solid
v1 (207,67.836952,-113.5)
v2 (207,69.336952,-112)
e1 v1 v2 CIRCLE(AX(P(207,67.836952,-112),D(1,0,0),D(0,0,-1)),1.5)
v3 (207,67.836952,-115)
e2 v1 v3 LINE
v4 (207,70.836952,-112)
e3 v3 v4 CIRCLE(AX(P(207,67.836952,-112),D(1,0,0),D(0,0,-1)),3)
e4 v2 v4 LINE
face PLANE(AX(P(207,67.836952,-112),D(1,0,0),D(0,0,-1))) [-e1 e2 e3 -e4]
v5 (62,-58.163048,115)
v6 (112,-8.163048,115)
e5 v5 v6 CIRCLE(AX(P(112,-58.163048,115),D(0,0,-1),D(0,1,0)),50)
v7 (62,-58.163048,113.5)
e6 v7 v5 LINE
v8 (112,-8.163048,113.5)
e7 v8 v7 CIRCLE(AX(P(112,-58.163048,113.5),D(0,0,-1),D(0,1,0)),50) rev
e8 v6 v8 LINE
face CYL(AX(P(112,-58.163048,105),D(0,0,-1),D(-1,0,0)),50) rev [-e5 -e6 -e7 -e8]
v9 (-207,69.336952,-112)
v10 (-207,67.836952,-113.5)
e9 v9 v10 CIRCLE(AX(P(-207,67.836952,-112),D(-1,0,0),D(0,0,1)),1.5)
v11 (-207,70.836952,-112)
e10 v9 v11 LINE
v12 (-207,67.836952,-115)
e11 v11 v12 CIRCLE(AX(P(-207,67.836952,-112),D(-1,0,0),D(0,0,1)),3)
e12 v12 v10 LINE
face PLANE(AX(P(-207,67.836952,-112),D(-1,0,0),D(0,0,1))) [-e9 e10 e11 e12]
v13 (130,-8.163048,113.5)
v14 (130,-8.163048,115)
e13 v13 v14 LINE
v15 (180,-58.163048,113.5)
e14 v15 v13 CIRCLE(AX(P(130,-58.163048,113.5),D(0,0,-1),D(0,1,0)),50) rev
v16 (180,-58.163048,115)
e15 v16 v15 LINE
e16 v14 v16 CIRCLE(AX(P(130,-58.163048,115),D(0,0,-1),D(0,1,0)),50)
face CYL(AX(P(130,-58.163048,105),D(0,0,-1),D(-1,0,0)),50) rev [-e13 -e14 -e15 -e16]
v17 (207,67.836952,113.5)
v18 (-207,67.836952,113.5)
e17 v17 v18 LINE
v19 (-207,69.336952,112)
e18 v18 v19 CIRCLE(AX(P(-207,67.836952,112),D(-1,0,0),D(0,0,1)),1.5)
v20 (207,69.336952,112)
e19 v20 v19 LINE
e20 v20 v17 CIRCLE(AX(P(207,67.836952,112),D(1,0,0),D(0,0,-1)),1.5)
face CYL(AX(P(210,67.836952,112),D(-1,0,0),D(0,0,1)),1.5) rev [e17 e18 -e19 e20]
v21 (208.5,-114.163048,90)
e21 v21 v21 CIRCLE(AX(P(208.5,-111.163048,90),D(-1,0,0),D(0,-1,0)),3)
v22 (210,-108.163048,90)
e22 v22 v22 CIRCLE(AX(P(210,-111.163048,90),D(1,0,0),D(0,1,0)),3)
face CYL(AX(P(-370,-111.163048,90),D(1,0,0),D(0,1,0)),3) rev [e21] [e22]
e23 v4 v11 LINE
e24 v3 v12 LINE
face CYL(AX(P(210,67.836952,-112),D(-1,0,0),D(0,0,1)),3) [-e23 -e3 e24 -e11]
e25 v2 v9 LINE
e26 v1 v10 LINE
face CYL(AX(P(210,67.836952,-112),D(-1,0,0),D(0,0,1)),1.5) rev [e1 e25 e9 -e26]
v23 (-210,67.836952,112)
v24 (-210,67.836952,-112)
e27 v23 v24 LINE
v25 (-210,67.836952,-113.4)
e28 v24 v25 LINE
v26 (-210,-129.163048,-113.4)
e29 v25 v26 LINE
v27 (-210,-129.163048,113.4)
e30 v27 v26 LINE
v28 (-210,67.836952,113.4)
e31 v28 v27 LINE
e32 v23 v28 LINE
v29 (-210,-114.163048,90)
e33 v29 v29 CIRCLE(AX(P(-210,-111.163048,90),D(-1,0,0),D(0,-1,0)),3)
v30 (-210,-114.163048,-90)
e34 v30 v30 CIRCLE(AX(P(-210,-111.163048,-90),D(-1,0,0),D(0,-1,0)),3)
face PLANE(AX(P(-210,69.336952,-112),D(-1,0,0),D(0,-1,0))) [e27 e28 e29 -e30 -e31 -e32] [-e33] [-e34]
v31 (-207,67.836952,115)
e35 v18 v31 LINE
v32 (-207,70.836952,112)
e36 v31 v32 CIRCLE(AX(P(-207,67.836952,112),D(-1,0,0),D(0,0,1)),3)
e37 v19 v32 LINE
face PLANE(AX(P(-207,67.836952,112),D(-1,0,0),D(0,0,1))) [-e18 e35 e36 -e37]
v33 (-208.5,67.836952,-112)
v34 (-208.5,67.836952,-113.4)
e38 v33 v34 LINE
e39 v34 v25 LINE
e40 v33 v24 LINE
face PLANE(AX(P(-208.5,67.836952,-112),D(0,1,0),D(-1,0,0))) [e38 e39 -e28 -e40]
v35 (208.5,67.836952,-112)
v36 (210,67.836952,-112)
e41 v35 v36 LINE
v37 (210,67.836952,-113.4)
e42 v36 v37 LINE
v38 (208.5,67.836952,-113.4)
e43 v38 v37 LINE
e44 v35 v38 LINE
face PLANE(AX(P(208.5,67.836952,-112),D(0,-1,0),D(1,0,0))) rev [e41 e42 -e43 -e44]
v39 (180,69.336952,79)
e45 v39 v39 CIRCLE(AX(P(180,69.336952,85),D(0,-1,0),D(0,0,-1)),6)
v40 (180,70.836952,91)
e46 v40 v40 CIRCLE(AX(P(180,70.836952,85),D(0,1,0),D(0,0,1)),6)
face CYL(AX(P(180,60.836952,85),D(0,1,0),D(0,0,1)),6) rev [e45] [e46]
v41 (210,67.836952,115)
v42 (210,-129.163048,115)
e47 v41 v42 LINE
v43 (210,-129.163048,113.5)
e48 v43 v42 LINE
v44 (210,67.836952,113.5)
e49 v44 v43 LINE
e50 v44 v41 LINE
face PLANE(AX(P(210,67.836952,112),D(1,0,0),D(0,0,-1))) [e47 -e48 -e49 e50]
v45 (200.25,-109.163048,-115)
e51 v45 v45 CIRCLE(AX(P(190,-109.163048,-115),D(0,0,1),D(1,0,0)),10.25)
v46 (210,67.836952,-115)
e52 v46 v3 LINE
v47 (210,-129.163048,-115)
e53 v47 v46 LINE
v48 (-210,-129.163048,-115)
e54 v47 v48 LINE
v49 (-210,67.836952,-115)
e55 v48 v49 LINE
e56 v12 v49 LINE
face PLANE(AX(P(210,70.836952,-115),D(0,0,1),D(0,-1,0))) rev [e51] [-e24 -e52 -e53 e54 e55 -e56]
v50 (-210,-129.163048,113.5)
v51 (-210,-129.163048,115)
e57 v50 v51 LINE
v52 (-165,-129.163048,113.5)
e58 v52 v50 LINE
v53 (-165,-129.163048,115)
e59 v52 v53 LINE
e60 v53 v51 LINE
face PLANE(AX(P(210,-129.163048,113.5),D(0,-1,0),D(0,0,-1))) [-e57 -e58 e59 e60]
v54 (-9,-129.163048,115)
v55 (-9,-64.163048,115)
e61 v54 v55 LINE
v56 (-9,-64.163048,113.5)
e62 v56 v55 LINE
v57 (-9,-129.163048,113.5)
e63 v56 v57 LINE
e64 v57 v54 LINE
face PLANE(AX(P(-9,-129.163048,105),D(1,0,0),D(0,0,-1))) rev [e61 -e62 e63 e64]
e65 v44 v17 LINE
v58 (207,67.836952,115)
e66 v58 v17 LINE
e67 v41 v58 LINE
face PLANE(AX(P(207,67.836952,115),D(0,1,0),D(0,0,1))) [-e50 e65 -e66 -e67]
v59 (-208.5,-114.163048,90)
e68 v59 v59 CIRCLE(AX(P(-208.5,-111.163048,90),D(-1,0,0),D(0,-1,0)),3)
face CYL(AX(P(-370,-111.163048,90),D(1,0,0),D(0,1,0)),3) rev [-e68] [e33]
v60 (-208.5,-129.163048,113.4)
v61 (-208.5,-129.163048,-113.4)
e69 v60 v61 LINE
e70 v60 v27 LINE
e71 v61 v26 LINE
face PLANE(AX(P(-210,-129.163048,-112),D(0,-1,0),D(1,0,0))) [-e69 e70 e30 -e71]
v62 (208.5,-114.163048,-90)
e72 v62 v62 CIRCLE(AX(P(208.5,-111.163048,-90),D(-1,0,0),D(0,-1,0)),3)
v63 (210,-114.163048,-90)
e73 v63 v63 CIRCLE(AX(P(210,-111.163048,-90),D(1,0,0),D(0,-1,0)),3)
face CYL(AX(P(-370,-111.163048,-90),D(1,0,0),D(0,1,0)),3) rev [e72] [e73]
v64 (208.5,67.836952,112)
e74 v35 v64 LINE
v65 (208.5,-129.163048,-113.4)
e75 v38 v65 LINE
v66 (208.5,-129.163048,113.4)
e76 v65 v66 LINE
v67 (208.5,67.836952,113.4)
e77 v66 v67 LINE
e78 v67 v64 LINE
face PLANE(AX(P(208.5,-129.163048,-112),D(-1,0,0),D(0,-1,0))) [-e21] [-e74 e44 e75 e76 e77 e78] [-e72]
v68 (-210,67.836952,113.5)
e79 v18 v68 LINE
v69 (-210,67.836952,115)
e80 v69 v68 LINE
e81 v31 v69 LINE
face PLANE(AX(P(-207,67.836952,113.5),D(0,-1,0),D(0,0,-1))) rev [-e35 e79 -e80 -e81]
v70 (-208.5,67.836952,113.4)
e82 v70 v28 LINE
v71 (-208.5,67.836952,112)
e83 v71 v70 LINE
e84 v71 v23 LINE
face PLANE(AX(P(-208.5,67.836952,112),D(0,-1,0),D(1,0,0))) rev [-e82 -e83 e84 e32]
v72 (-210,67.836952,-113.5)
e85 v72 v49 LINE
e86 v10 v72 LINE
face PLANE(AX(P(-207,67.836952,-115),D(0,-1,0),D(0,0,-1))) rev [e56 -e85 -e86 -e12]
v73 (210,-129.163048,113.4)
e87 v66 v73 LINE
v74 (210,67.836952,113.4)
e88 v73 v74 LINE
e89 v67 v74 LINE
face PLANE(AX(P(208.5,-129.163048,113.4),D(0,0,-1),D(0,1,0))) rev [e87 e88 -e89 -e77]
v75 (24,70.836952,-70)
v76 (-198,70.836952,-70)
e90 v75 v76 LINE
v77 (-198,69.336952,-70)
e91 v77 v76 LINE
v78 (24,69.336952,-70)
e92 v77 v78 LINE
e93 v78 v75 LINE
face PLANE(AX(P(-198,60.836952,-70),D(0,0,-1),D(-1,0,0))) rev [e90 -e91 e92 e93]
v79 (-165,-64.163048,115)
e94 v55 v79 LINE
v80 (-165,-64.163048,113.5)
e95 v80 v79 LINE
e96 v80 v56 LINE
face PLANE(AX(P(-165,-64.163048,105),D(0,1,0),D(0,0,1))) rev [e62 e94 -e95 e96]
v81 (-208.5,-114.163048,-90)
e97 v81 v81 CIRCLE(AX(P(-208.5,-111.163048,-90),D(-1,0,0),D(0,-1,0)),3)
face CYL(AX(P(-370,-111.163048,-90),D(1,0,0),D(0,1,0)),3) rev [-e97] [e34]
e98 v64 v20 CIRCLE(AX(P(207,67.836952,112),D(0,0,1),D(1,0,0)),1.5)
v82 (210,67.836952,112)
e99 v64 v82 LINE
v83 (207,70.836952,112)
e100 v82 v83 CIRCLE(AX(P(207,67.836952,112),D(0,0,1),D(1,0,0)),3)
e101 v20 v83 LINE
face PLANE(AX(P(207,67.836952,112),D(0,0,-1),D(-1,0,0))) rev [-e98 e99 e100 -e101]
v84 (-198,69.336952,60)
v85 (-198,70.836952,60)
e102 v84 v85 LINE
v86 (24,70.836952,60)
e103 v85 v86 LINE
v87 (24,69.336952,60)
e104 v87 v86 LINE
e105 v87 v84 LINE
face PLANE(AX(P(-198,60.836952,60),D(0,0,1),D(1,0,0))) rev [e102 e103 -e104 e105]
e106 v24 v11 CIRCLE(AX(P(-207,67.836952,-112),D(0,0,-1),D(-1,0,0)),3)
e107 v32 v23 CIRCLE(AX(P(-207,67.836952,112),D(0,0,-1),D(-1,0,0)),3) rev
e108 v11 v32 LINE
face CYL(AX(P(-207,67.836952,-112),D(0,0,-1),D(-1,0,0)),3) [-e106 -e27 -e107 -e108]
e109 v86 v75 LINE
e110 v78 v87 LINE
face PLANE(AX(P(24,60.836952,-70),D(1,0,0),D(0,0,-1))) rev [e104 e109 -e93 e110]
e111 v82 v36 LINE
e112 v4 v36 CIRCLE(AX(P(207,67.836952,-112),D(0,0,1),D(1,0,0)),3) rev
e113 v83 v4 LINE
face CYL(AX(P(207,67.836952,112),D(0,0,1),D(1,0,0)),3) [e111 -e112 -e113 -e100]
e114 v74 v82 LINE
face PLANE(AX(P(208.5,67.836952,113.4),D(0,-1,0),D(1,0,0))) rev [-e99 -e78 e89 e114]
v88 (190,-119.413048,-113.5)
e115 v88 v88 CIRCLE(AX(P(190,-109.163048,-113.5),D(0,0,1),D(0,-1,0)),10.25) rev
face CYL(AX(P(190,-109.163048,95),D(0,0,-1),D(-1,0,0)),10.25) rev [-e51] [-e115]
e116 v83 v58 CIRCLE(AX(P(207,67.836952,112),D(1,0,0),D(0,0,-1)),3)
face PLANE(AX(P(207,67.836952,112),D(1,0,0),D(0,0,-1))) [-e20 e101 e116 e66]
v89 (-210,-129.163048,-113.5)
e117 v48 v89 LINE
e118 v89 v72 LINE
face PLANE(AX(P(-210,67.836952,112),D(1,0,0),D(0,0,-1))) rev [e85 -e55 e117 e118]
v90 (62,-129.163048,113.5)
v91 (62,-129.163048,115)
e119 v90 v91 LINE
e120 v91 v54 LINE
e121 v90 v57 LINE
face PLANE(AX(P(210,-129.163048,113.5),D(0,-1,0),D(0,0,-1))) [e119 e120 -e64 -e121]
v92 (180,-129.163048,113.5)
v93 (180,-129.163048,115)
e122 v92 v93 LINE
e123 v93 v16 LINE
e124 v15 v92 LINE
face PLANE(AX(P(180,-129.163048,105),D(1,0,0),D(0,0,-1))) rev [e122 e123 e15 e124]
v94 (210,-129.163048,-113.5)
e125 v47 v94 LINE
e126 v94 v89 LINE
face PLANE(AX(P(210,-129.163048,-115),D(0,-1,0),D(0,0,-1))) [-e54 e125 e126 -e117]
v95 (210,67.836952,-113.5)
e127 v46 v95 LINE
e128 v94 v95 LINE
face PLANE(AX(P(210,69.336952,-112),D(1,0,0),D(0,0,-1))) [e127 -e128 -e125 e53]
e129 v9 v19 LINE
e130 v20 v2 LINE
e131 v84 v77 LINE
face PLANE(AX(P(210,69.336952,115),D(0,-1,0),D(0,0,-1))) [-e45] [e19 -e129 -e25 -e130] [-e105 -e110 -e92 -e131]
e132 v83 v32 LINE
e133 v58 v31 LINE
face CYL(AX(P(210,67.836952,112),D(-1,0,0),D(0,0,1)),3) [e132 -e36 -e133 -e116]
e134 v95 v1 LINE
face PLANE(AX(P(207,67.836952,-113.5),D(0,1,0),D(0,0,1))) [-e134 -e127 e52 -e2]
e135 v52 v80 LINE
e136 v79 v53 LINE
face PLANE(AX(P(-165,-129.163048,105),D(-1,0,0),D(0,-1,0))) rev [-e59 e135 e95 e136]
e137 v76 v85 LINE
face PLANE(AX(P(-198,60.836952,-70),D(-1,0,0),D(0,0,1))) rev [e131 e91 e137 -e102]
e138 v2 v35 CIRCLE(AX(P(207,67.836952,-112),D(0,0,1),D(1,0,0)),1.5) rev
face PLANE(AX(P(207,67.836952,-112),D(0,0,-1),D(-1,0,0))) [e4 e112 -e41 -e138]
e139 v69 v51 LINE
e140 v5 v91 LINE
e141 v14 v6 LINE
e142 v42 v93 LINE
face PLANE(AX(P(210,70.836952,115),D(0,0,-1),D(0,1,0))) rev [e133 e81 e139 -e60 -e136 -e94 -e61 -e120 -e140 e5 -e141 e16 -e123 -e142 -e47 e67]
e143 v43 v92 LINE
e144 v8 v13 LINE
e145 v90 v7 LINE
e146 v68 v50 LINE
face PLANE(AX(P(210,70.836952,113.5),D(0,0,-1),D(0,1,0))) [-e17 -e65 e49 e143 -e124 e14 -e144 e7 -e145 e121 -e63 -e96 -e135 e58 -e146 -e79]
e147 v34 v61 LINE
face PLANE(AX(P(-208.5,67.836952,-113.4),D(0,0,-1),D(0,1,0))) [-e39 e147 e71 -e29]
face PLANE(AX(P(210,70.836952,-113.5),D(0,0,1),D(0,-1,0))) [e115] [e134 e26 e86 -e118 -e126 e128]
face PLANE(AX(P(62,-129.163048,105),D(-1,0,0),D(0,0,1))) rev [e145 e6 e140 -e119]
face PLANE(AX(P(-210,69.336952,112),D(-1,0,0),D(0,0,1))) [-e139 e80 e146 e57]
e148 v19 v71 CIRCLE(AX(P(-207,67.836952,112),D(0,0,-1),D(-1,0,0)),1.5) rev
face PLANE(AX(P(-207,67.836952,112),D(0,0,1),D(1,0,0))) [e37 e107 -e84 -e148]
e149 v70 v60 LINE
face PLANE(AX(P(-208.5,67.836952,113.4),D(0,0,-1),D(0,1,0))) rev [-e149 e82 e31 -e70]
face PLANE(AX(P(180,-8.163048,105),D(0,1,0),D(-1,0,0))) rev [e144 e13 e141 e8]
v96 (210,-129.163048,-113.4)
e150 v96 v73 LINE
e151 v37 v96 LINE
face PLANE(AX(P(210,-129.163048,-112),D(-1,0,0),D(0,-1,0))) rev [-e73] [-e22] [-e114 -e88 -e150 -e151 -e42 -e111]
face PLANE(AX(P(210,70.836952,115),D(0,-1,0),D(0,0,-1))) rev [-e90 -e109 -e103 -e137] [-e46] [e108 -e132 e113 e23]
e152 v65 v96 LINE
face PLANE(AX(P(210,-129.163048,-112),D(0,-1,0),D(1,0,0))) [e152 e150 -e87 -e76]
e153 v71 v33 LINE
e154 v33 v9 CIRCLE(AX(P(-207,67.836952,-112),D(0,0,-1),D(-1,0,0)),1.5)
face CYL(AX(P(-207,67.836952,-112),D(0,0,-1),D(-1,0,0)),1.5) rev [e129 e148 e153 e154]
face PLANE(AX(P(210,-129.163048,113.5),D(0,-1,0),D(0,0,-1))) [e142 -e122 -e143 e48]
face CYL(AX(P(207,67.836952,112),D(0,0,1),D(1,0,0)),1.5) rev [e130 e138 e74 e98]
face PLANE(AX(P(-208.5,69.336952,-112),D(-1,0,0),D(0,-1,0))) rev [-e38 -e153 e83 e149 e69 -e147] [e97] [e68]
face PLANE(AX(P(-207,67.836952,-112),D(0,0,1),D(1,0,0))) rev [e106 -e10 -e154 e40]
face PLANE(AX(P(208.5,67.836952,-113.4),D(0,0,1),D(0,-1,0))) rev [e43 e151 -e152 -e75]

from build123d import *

# Parameters (mm, degrees)
BASE_FLANGE2_DEPTH       = 210
SKETCH8_R                = 6
SKETCH8_W                = 222
SKETCH8_H                = 130
CUT_EXTRUDE1_DEPTH       = 10
SKETCH14_W               = 156
SKETCH14_H               = 65
SKETCH14_W_2             = 118
SKETCH14_H_2             = 121
CUT_EXTRUDE2_DEPTH       = 10
EDGE_FLANGE1_START       = -115
EDGE_FLANGE1_DEPTH       = 230
EDGE_FLANGE1_2_DEPTH     = 3
EDGE_FLANGE1_START_2     = 112
EDGE_FLANGE1_3_DEPTH     = 3
EDGE_FLANGE1_START_3     = -112
EDGE_FLANGE1_4_DEPTH     = 224
CLOSED_START             = -129.163047535
CLOSED_CORNER1_OUTLINE_W = 1.5
CLOSED_CORNER1_OUTLINE_H = 1.4
CLOSED_CORNER1_DEPTH     = 197
SKETCH35_R               = 10.25
CUT_EXTRUDE4_DEPTH       = 210
FILLET1_R                = 50
SKETCH37_R               = 3
CUT_EXTRUDE5_DEPTH       = 580


# Read off the part's stored shape, not the designer's step: Edge-Flange1, Closed Corner1
# Sheet-metal steps are written as plain solids
with BuildPart() as part:
    # Sketch5 → Base-Flange2 (new, symmetric)
    with BuildSketch(Plane(origin=(0, 0, 0), x_dir=(0, 0, -1), z_dir=(1, 0, 0))):
        with BuildLine():
            Line((-115, -129.163047535), (-115, 67.836952465))
            ThreePointArc((-115, 67.836952465), (-114.121320344, 69.958272808), (-112, 70.836952465))
            Line((-112, 70.836952465), (112, 70.836952465))
            ThreePointArc((112, 70.836952465), (114.121320344, 69.958272808), (115, 67.836952465))
            Line((115, 67.836952465), (115, -129.163047535))
            Line((115, -129.163047535), (113.5, -129.163047535))
            Line((113.5, -129.163047535), (113.5, 67.836952465))
            ThreePointArc((113.5, 67.836952465), (113.060660172, 68.897612636), (112, 69.336952465))
            Line((112, 69.336952465), (-112, 69.336952465))
            ThreePointArc((-112, 69.336952465), (-113.060660172, 68.897612636), (-113.5, 67.836952465))
            Line((-113.5, 67.836952465), (-113.5, -129.163047535))
            Line((-113.5, -129.163047535), (-115, -129.163047535))
        make_face()
    extrude(amount=BASE_FLANGE2_DEPTH, both=True)

    # Sketch8 → Cut-Extrude1 (cut)
    with BuildSketch(Plane(origin=(0, 70.836952465, 0), x_dir=(1, 0, 0), z_dir=(0, 1, 0))):
        with Locations(Location((180, -85, 0), (0, 0, 270))):
            Circle(SKETCH8_R)
        with Locations((-87, 5)):
            Rectangle(SKETCH8_W, SKETCH8_H)
    extrude(amount=-CUT_EXTRUDE1_DEPTH, mode=Mode.SUBTRACT)

    # Sketch14 → Cut-Extrude2 (cut)
    with BuildSketch(Plane.XY.offset(115)):
        with Locations((-87, -96.663047535)):
            Rectangle(SKETCH14_W, SKETCH14_H)
        with Locations((121, -68.663047535)):
            Rectangle(SKETCH14_W_2, SKETCH14_H_2)
    extrude(amount=-CUT_EXTRUDE2_DEPTH, mode=Mode.SUBTRACT)

    # Edge-Flange1 outline → Edge-Flange1 (cut)
    with BuildSketch(Plane.XY.offset(EDGE_FLANGE1_START)):
        with BuildLine():
            Line((210, 67.836952465), (210, 70.836952465))
            Line((210, 70.836952465), (207, 70.836952465))
            ThreePointArc((207, 70.836952465), (209.121320344, 69.958272808), (210, 67.836952465))
        make_face()
        with BuildLine():
            Line((207, 67.836952465), (208.5, 67.836952465))
            ThreePointArc((208.5, 67.836952465), (208.060660172, 68.897612636), (207, 69.336952465))
            Line((207, 69.336952465), (207, 67.836952465))
        make_face()
        with BuildLine():
            Line((-207, 67.836952465), (-207, 69.336952465))
            ThreePointArc((-207, 69.336952465), (-208.060660172, 68.897612636), (-208.5, 67.836952465))
            Line((-208.5, 67.836952465), (-207, 67.836952465))
        make_face()
        with BuildLine():
            Line((-207, 70.836952465), (-210, 70.836952465))
            Line((-210, 70.836952465), (-210, 67.836952465))
            ThreePointArc((-210, 67.836952465), (-209.121320344, 69.958272808), (-207, 70.836952465))
        make_face()
    extrude(amount=EDGE_FLANGE1_DEPTH, mode=Mode.SUBTRACT)

    # Edge-Flange1 2 outline → Edge-Flange1 2 (cut)
    with BuildSketch(Plane.XY.offset(EDGE_FLANGE1_START)):
        with BuildLine():
            Line((208.5, 67.836952465), (210, 67.836952465))
            ThreePointArc((210, 67.836952465), (209.121320344, 69.958272808), (207, 70.836952465))
            Line((207, 70.836952465), (207, 69.336952465))
            ThreePointArc((207, 69.336952465), (208.060660172, 68.897612636), (208.5, 67.836952465))
        make_face()
        with BuildLine():
            ThreePointArc((-207, 70.836952465), (-209.121320344, 69.958272808), (-210, 67.836952465))
            Line((-210, 67.836952465), (-208.5, 67.836952465))
            ThreePointArc((-208.5, 67.836952465), (-208.060660172, 68.897612636), (-207, 69.336952465))
            Line((-207, 69.336952465), (-207, 70.836952465))
        make_face()
    extrude(amount=EDGE_FLANGE1_2_DEPTH, mode=Mode.SUBTRACT)

    # Edge-Flange1 3 outline → Edge-Flange1 3 (cut)
    with BuildSketch(Plane.XY.offset(EDGE_FLANGE1_START_2)):
        with BuildLine():
            Line((208.5, 67.836952465), (210, 67.836952465))
            ThreePointArc((210, 67.836952465), (209.121320344, 69.958272808), (207, 70.836952465))
            Line((207, 70.836952465), (207, 69.336952465))
            ThreePointArc((207, 69.336952465), (208.060660172, 68.897612636), (208.5, 67.836952465))
        make_face()
        with BuildLine():
            ThreePointArc((-207, 70.836952465), (-209.121320344, 69.958272808), (-210, 67.836952465))
            Line((-210, 67.836952465), (-208.5, 67.836952465))
            ThreePointArc((-208.5, 67.836952465), (-208.060660172, 68.897612636), (-207, 69.336952465))
            Line((-207, 69.336952465), (-207, 70.836952465))
        make_face()
    extrude(amount=EDGE_FLANGE1_3_DEPTH, mode=Mode.SUBTRACT)

    # Edge-Flange1 4 outline → Edge-Flange1 4 (add)
    with BuildSketch(Plane.XY.offset(EDGE_FLANGE1_START_3)):
        with BuildLine():
            Line((210, -129.163047535), (210, 67.836952465))
            ThreePointArc((210, 67.836952465), (209.897777479, 68.6134096), (209.598076211, 69.336952465))
            Line((209.598076211, 69.336952465), (207, 69.336952465))
            ThreePointArc((207, 69.336952465), (208.060660172, 68.897612636), (208.5, 67.836952465))
            Line((208.5, 67.836952465), (208.5, -129.163047535))
            Line((208.5, -129.163047535), (210, -129.163047535))
        make_face()
        with BuildLine():
            ThreePointArc((-208.5, 67.836952465), (-208.060660172, 68.897612636), (-207, 69.336952465))
            Line((-207, 69.336952465), (-209.598076211, 69.336952465))
            ThreePointArc((-209.598076211, 69.336952465), (-209.897777479, 68.6134096), (-210, 67.836952465))
            Line((-210, 67.836952465), (-210, -129.163047535))
            Line((-210, -129.163047535), (-208.5, -129.163047535))
            Line((-208.5, -129.163047535), (-208.5, 67.836952465))
        make_face()
    extrude(amount=EDGE_FLANGE1_4_DEPTH)

    # Closed Corner1 outline → Closed Corner1 (add)
    with BuildSketch(Plane(origin=(0, 0, 0), x_dir=(1, 0, 0), z_dir=(0, 1, 0)).offset(CLOSED_START)):
        with Locations((-209.25, -112.7)):
            Rectangle(CLOSED_CORNER1_OUTLINE_W, CLOSED_CORNER1_OUTLINE_H)
        with Locations((-209.25, 112.7)):
            Rectangle(CLOSED_CORNER1_OUTLINE_W, CLOSED_CORNER1_OUTLINE_H)
        with Locations((209.25, -112.7)):
            Rectangle(CLOSED_CORNER1_OUTLINE_W, CLOSED_CORNER1_OUTLINE_H)
        with Locations((209.25, 112.7)):
            Rectangle(CLOSED_CORNER1_OUTLINE_W, CLOSED_CORNER1_OUTLINE_H)
    extrude(amount=CLOSED_CORNER1_DEPTH)

    # Sketch35 → Cut-Extrude4 (cut)
    with BuildSketch(Plane(origin=(95, 0, -115), x_dir=(1, 0, 0), z_dir=(0, 0, 1))):
        with Locations(Location((95, -109.163047535, 0), (0, 0, 270))):
            Circle(SKETCH35_R)
    extrude(amount=CUT_EXTRUDE4_DEPTH, mode=Mode.SUBTRACT)

    # Fillet1
    fillet1_edges = [part.edges().sort_by_distance(p)[0] for p in [
        (180, -8.163047535, 114.25),
        (62, -8.163047535, 114.25),
    ]]
    fillet(fillet1_edges, radius=FILLET1_R)

    # Sketch37 → Cut-Extrude5 (cut)
    with BuildSketch(Plane(origin=(210, 0, 0), x_dir=(0, 0, -1), z_dir=(1, 0, 0))):
        with Locations(Location((-90, -111.163047535, 0), (0, 0, 90))):
            Circle(SKETCH37_R)
        with Locations(Location((90, -111.163047535, 0), (0, 0, 270))):
            Circle(SKETCH37_R)
    extrude(amount=-CUT_EXTRUDE5_DEPTH, mode=Mode.SUBTRACT)


solid = part.part
